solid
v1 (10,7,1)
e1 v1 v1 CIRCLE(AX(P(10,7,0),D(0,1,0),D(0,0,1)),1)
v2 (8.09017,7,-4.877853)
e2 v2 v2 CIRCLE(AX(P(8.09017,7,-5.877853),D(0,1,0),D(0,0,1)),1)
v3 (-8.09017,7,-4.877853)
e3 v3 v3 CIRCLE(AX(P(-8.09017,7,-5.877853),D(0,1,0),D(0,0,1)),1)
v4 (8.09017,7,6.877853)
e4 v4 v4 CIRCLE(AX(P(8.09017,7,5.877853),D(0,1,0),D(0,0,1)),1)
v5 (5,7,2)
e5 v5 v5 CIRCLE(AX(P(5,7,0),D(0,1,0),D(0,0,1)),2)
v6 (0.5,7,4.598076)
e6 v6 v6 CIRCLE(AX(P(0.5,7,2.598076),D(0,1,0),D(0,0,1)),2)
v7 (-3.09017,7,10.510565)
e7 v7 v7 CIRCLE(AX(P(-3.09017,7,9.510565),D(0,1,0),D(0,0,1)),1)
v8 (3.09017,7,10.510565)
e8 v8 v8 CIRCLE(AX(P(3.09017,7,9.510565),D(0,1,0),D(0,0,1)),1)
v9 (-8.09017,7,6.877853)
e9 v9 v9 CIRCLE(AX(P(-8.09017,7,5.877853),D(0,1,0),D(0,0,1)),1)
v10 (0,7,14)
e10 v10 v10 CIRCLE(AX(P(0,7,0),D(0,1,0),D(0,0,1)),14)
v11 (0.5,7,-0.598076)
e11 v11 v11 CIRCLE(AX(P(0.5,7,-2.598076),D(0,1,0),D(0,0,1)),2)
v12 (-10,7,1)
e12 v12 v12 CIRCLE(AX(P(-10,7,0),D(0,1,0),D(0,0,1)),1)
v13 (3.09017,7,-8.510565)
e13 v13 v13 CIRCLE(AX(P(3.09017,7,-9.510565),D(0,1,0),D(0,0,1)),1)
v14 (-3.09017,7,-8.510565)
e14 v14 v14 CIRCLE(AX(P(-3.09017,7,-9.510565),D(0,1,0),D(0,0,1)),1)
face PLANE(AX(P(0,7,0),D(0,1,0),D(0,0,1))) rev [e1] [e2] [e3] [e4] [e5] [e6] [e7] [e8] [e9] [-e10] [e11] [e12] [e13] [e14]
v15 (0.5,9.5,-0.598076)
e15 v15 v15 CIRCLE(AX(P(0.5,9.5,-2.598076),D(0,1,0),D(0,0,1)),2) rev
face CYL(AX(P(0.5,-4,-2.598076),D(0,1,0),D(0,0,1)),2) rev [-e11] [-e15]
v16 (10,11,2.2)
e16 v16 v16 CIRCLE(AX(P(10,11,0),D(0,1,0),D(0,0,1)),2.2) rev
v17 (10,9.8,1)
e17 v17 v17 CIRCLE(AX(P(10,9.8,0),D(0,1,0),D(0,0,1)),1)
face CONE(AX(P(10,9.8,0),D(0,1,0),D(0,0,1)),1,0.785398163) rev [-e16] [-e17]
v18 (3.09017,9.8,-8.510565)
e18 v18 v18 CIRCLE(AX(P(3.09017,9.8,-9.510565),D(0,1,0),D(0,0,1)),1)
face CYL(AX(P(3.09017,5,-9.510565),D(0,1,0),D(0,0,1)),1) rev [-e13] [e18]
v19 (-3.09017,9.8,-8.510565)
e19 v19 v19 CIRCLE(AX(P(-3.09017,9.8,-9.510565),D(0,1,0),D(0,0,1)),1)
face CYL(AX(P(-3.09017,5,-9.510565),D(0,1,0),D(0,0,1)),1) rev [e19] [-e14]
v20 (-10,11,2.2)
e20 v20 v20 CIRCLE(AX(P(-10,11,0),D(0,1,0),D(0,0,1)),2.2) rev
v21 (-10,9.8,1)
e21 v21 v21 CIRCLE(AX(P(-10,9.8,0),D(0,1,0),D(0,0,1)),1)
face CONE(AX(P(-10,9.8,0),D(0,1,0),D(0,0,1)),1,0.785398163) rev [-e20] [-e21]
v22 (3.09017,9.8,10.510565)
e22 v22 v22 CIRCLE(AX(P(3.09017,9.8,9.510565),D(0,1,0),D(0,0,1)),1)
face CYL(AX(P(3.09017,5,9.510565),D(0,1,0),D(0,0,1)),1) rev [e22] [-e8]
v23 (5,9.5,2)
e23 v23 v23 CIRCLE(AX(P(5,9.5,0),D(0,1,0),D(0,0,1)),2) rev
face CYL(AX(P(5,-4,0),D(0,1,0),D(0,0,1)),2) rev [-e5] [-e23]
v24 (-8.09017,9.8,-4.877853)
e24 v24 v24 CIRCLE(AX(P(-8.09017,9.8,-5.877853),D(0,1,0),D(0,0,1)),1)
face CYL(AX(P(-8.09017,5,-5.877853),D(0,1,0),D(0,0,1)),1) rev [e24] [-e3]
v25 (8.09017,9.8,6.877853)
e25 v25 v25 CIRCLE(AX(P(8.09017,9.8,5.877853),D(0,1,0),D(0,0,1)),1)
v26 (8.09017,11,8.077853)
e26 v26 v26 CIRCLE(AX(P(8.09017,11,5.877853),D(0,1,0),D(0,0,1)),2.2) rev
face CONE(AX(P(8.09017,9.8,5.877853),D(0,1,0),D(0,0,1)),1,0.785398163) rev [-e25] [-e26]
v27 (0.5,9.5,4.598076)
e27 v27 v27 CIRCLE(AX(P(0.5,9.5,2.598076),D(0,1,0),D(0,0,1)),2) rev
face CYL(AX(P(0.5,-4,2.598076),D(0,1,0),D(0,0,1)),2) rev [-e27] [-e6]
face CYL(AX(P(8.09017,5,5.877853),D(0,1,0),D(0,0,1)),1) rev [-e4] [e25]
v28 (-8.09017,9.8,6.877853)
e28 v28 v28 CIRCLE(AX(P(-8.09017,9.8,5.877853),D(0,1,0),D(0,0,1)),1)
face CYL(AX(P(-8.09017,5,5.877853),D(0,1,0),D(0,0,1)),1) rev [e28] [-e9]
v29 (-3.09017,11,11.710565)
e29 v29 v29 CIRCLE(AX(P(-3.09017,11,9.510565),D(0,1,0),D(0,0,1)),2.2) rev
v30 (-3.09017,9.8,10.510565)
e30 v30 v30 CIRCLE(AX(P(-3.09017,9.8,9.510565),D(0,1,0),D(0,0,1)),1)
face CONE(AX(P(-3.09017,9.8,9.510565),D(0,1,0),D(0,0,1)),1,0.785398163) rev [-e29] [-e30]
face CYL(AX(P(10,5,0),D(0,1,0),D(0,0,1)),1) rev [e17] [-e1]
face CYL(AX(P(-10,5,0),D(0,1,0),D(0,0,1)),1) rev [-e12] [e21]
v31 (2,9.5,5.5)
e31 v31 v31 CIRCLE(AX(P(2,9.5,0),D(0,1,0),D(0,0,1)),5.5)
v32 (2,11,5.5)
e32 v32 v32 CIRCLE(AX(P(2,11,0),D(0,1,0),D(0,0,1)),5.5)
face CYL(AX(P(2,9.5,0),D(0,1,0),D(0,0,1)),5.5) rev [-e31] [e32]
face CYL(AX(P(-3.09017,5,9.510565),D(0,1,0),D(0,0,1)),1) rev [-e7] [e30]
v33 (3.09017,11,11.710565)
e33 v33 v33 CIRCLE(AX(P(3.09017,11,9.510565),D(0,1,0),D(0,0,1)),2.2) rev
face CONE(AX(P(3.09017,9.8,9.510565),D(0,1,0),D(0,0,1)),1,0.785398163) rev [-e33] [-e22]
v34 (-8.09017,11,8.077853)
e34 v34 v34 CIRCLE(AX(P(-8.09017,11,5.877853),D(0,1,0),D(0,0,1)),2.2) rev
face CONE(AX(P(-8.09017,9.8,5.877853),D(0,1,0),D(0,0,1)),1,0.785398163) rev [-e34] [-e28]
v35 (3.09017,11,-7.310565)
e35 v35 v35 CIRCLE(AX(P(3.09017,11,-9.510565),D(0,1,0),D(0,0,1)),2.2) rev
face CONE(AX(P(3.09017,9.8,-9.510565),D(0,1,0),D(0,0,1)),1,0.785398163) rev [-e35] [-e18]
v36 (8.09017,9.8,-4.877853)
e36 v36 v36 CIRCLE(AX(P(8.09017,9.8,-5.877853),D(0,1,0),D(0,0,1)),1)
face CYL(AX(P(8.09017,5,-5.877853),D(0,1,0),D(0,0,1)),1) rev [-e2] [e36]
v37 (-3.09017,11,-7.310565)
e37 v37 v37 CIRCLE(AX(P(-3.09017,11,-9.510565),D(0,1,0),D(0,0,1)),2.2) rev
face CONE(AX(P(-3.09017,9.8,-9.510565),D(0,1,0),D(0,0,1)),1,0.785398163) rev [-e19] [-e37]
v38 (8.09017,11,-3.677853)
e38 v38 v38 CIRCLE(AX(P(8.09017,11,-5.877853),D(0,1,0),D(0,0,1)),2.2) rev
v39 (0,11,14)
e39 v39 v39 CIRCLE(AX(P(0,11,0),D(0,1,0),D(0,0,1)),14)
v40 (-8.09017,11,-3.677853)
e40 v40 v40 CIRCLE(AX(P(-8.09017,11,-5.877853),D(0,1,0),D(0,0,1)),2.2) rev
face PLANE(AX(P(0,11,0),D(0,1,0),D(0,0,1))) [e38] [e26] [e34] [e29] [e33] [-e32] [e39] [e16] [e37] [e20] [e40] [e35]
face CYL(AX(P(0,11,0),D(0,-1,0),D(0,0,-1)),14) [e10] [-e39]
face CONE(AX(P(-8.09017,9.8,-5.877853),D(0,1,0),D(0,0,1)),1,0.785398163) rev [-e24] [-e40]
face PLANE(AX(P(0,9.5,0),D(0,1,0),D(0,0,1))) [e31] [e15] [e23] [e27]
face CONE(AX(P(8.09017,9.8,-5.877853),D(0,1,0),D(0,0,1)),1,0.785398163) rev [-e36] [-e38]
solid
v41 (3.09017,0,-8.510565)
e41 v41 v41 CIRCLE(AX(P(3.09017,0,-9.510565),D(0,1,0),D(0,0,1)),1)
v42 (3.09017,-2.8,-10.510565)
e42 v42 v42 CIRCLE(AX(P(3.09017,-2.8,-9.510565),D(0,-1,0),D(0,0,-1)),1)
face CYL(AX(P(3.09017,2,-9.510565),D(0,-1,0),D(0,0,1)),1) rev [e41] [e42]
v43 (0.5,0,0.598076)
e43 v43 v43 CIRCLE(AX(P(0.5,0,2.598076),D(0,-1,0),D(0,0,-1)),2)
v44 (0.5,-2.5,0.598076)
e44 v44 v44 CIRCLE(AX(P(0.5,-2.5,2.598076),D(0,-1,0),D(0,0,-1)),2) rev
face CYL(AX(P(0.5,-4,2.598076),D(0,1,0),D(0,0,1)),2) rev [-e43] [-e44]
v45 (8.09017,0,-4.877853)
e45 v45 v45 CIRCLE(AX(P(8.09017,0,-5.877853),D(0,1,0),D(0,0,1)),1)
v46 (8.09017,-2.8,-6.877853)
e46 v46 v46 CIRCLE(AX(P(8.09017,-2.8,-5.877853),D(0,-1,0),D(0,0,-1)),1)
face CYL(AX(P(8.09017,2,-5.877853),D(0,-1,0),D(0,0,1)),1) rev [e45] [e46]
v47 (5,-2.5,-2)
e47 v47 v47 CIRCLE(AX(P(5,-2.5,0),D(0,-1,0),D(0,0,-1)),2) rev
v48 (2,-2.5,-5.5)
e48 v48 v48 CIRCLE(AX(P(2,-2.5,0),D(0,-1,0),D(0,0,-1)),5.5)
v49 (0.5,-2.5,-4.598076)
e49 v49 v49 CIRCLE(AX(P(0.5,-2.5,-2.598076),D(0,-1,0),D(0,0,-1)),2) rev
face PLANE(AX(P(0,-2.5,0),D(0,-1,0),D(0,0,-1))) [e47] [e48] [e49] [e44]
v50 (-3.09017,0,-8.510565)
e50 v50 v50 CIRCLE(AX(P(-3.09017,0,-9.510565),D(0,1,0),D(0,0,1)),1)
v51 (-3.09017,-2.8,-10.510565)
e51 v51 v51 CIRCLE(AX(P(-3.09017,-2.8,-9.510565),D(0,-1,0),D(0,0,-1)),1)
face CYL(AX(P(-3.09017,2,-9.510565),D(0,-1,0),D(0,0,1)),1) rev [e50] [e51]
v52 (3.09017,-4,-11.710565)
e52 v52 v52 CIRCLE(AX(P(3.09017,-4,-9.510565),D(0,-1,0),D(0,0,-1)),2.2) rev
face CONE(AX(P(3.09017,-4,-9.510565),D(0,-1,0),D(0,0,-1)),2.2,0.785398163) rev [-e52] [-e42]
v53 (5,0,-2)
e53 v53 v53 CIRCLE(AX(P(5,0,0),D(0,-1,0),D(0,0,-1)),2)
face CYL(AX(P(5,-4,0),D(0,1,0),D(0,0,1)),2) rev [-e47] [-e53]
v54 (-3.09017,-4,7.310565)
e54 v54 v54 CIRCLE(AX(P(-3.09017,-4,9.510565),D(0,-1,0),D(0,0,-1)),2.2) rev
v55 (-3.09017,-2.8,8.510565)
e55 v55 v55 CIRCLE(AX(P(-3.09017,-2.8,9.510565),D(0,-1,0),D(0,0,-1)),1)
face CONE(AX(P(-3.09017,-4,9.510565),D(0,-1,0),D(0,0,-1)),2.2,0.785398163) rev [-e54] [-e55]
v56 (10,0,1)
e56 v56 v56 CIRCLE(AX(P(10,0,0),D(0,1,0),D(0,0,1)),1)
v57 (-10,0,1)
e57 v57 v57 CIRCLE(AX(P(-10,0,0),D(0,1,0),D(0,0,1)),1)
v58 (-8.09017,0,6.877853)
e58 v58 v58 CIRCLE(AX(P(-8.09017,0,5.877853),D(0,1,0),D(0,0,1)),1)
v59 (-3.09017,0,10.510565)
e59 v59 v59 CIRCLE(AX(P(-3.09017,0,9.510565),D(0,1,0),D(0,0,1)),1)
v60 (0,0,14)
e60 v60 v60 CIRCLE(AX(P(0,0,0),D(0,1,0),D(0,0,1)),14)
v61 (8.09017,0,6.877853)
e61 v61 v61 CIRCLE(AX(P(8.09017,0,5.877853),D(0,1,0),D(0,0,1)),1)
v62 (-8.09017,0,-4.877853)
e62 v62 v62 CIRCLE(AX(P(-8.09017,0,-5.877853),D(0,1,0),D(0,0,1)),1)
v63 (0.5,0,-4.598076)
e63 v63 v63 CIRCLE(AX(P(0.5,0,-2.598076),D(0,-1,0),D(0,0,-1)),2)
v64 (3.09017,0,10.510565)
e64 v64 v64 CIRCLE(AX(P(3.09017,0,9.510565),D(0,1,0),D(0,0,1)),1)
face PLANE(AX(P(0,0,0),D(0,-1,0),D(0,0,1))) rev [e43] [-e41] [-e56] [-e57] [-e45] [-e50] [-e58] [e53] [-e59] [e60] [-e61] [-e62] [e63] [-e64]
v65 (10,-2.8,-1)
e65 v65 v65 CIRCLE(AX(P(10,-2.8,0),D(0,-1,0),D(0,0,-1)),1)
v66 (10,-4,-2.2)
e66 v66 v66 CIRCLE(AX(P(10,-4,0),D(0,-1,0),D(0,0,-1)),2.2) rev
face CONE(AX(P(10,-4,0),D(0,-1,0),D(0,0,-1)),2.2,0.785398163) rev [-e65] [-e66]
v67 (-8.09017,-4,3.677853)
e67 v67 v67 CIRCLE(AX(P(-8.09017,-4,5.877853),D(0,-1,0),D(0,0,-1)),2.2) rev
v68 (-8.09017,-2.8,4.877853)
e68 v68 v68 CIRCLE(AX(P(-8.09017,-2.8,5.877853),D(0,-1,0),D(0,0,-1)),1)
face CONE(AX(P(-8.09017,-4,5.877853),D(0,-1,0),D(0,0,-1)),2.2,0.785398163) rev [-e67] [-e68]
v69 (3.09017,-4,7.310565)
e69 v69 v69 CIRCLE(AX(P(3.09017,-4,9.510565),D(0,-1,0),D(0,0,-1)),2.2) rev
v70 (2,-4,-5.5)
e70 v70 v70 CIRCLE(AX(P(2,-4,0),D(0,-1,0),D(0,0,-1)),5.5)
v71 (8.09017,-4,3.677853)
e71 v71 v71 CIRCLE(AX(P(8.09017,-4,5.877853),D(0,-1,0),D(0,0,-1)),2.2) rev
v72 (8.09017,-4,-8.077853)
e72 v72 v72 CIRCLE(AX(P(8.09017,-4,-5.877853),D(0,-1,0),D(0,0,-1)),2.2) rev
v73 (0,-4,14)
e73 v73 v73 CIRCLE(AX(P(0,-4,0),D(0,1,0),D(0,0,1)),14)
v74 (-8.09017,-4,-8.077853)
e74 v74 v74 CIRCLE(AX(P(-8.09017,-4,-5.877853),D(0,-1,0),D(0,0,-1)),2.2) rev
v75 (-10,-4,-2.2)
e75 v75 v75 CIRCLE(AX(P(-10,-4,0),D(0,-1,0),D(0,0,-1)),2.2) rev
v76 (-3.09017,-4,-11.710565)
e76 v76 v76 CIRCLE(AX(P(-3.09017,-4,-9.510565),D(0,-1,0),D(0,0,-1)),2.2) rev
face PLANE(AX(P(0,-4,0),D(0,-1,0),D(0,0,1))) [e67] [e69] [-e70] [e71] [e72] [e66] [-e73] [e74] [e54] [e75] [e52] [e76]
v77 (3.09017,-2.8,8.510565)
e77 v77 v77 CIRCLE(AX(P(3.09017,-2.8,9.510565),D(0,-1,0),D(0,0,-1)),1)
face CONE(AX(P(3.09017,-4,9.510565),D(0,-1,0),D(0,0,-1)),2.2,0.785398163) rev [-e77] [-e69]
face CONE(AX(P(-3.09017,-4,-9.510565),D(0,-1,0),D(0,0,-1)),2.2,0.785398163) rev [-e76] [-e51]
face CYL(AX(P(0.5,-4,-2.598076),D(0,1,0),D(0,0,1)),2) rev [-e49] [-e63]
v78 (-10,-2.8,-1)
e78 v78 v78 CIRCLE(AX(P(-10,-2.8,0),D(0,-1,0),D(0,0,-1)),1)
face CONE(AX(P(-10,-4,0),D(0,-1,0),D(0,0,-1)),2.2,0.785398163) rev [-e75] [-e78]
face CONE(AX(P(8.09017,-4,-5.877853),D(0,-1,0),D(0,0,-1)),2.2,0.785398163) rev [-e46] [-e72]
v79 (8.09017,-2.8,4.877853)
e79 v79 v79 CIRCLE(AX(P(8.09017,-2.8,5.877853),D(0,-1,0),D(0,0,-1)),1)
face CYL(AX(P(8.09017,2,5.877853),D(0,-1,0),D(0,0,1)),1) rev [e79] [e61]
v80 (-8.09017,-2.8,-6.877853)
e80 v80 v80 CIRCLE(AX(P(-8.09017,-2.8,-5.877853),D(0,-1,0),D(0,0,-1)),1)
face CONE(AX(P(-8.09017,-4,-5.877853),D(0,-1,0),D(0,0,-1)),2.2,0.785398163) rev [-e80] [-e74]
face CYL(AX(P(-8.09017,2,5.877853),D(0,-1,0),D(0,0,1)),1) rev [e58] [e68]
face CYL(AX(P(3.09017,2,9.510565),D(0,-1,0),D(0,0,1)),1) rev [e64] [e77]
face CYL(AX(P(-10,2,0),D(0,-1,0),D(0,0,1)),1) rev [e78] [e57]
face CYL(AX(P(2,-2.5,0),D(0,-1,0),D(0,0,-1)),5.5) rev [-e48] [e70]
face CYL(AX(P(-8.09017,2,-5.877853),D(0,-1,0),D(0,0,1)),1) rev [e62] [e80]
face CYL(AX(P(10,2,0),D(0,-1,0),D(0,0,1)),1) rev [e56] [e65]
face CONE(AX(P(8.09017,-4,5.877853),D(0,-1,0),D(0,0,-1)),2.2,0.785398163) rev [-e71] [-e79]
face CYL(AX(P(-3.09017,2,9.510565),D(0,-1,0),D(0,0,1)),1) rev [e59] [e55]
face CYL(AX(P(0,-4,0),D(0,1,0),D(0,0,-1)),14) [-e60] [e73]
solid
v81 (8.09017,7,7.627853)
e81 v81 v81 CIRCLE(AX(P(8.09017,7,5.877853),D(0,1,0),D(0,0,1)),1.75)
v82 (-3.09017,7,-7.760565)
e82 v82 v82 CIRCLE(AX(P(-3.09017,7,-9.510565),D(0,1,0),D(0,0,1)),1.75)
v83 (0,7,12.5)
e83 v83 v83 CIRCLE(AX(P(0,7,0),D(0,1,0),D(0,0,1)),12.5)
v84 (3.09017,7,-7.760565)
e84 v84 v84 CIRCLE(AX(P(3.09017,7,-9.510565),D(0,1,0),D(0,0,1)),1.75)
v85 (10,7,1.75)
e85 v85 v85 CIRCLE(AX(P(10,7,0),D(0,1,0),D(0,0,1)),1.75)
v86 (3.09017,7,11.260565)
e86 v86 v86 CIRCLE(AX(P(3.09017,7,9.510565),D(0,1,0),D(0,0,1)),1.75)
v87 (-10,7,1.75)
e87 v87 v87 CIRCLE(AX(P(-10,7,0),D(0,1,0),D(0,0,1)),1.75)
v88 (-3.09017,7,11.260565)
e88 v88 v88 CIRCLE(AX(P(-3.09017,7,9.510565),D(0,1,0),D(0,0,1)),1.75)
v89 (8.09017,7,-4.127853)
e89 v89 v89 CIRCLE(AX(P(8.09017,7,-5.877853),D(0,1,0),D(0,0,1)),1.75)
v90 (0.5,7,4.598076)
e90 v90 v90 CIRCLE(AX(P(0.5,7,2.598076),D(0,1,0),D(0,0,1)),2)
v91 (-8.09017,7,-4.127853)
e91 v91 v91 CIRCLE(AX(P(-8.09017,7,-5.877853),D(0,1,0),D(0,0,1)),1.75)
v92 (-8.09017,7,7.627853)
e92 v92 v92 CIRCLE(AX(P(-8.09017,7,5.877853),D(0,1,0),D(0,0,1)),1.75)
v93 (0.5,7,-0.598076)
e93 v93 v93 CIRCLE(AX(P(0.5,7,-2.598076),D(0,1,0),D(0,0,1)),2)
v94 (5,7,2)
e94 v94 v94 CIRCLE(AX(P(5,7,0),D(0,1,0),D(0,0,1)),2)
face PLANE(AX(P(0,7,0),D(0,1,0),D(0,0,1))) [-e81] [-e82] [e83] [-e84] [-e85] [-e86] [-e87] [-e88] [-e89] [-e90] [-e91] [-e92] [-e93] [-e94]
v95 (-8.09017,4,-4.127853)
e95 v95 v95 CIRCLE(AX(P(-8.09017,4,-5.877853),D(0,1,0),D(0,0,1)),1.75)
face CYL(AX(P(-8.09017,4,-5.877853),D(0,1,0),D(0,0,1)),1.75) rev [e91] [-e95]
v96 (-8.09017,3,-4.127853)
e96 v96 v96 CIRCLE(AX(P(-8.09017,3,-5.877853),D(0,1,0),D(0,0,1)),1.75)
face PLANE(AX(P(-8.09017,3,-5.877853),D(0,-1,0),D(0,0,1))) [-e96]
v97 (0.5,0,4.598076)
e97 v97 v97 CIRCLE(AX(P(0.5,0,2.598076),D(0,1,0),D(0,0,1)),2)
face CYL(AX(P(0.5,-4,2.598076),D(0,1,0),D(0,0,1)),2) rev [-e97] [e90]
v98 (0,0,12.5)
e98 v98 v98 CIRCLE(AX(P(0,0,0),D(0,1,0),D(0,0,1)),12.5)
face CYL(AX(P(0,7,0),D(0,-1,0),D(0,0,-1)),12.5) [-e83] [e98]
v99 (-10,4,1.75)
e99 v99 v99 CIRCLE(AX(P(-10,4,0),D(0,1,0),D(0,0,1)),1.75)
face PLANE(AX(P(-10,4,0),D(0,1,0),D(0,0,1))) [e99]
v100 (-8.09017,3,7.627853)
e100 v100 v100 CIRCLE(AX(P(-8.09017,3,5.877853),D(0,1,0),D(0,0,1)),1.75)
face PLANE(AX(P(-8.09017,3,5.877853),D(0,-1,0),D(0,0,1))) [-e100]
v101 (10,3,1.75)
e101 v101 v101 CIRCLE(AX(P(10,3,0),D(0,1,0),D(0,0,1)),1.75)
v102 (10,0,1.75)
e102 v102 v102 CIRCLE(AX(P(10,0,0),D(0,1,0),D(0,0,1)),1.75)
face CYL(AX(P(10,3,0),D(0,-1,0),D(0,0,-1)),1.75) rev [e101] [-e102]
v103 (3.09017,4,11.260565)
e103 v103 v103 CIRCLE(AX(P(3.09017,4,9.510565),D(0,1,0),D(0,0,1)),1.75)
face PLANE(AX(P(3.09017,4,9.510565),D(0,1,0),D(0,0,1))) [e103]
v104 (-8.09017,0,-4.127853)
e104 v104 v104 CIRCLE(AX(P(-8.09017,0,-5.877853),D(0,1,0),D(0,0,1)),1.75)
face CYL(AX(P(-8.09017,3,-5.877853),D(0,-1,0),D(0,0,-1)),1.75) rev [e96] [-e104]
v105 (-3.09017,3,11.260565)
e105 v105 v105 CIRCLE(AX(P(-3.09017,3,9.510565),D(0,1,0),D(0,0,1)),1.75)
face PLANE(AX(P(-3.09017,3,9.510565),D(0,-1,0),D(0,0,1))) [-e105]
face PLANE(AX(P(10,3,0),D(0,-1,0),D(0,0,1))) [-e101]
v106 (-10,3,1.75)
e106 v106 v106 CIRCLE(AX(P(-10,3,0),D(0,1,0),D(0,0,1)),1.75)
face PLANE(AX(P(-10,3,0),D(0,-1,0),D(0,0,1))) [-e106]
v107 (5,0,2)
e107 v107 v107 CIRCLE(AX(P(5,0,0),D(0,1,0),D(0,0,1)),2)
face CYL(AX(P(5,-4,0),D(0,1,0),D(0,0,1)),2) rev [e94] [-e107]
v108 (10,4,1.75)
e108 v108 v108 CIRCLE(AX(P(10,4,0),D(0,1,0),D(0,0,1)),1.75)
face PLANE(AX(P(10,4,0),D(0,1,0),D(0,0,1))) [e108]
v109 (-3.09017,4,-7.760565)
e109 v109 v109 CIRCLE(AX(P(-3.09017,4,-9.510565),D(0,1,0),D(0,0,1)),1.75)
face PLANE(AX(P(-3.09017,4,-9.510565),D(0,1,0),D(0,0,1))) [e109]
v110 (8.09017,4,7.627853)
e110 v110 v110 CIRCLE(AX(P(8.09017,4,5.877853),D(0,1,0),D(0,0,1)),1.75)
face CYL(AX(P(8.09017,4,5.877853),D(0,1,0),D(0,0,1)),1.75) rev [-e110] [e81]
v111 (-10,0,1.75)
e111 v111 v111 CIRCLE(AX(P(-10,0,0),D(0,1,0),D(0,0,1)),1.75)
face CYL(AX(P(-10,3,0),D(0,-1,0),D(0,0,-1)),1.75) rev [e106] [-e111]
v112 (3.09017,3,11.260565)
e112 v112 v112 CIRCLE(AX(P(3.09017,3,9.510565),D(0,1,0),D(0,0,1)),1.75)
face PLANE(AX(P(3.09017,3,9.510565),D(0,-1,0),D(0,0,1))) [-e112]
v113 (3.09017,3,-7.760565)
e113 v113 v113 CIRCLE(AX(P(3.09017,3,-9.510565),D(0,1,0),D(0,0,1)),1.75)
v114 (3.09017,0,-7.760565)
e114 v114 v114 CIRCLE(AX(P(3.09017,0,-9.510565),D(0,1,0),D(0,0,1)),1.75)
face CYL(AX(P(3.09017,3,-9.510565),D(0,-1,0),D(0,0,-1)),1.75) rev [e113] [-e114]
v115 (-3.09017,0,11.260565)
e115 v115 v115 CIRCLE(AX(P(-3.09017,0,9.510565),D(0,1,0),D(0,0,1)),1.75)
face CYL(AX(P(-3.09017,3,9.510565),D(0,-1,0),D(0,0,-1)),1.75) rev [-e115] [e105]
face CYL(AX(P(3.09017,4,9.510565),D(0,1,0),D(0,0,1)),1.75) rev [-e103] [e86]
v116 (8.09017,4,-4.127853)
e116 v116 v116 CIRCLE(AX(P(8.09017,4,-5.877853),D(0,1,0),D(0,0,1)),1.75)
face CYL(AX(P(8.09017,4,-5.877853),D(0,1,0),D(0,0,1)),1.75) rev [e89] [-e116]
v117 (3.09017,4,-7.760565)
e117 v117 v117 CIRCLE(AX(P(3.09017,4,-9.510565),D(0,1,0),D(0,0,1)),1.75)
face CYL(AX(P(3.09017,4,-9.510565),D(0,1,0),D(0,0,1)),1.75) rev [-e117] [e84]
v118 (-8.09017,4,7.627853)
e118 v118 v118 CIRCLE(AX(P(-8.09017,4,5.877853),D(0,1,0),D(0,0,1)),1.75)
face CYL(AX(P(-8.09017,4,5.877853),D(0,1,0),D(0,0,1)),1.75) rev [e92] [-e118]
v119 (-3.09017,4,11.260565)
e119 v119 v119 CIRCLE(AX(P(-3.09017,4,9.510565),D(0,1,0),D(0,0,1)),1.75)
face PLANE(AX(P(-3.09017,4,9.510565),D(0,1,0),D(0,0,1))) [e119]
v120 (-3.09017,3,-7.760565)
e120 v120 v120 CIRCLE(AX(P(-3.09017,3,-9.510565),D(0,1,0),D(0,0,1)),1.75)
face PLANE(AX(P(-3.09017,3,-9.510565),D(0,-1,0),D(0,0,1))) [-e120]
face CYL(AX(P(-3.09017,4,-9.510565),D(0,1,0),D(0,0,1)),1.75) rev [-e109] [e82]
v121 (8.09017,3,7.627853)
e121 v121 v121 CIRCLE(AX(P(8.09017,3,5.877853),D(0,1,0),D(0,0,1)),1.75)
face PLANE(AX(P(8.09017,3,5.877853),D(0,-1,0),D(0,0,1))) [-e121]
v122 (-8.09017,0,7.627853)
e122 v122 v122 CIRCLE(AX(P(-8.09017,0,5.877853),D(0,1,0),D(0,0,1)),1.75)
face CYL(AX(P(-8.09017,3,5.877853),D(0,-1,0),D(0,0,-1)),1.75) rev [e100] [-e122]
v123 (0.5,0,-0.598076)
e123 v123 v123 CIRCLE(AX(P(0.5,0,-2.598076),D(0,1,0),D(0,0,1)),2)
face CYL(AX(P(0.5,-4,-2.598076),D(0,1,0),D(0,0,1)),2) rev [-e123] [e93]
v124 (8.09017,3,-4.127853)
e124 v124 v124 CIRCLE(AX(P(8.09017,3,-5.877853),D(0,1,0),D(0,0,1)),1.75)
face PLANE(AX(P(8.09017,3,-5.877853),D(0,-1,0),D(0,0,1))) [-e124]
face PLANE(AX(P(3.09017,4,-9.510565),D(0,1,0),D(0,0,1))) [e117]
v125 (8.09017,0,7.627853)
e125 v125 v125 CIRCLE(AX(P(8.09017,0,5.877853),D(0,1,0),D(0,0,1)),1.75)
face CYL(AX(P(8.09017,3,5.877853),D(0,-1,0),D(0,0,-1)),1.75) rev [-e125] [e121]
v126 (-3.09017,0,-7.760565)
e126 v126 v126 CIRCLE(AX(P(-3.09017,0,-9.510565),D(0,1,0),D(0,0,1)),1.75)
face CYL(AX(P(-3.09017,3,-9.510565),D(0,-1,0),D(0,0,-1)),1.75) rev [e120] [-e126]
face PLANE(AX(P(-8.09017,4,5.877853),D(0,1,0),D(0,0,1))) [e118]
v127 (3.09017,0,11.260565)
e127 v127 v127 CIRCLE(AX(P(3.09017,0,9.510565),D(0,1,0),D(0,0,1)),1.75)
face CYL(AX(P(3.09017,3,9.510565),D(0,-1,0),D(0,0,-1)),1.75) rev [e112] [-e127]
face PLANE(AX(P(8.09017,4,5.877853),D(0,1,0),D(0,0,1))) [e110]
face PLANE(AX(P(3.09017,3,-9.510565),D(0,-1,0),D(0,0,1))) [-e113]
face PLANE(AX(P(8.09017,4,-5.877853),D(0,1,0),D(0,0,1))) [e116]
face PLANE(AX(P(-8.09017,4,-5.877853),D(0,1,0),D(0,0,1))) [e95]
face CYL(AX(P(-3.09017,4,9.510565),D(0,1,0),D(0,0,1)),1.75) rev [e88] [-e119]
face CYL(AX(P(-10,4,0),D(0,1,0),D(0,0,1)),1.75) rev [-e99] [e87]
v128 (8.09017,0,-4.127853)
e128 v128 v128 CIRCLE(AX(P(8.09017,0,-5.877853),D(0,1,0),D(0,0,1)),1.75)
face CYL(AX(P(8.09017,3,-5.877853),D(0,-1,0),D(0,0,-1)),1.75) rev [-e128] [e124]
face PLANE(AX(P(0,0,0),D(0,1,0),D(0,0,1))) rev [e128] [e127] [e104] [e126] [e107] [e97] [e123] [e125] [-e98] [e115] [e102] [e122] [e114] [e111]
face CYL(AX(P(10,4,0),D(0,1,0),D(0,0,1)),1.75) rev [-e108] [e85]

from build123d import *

# Parameters (mm, degrees)
SKETCH1_R               = 12.5
BOSS_EXTRUDE1_DEPTH     = 7
SKETCH2_R               = 14
BOSS_EXTRUDE2_DEPTH     = 4
SKETCH3_R               = 14
BOSS_EXTRUDE3_DEPTH     = 4
SKETCH4_R               = 1
CUT_EXTRUDE1_DEPTH      = 6
SKETCH6_R               = 1.75
CUT_EXTRUDE2_DEPTH      = 3
CHAMFER1_SIZE           = 1.2
CHAMFER2_SIZE           = 1.2
CUT_EXTRUDE4_DEPTH      = 25.839484697
CUT_EXTRUDE4_DEPTH_BACK = 25.839484697
SKETCH7_R               = 2
SKETCH8_R               = 5.5
CUT_EXTRUDE5_DEPTH      = 1.5
SKETCH9_R               = 5.5
SKETCH9_R_2             = 2
BOSS_EXTRUDE4_DEPTH     = 3
SKETCH10_R              = 5.5
CUT_EXTRUDE6_DEPTH      = 1.5


# Read off the part's stored shape, not the designer's step: Intersect1
with BuildPart() as part:
    # Sketch1 → Boss-Extrude1 (new body)
    with BuildSketch(Plane(origin=(0, 0, 0), x_dir=(1, 0, 0), z_dir=(0, 1, 0))):
        with Locations(Location((0, 0, 0), (0, 0, 270))):
            Circle(SKETCH1_R)
    extrude(amount=BOSS_EXTRUDE1_DEPTH)

    # Sketch3 → Boss-Extrude3 (add)
    with BuildSketch(Plane.XZ):
        with Locations(Location((0, 0, 0), (0, 0, 90))):
            Circle(SKETCH3_R)
    extrude(amount=BOSS_EXTRUDE3_DEPTH)


with BuildPart() as body_2:
    # Sketch2 → Boss-Extrude2 (new body)
    with BuildSketch(Plane(origin=(0, 7, 0), x_dir=(1, 0, 0), z_dir=(0, 1, 0))):
        with Locations(Location((0, 0, 0), (0, 0, 270))):
            Circle(SKETCH2_R)
    extrude(amount=BOSS_EXTRUDE2_DEPTH)


with BuildPart() as cut_extrude1_tool:
    # Sketch4 → Cut-Extrude1 (new body)
    with BuildSketch(Plane(origin=(0, 11, 0), x_dir=(1, 0, 0), z_dir=(0, 1, 0))):
        with Locations(Location((10, 0, 0), (0, 0, 270))):
            Circle(SKETCH4_R)
        with Locations(Location((8.090169944, -5.877852523, 0), (0, 0, 270))):
            Circle(SKETCH4_R)
        with Locations(Location((3.090169944, -9.510565163, 0), (0, 0, 270))):
            Circle(SKETCH4_R)
        with Locations(Location((-3.090169944, -9.510565163, 0), (0, 0, 270))):
            Circle(SKETCH4_R)
        with Locations(Location((-8.090169944, -5.877852523, 0), (0, 0, 270))):
            Circle(SKETCH4_R)
        with Locations(Location((-10, 0, 0), (0, 0, 270))):
            Circle(SKETCH4_R)
        with Locations(Location((-8.090169944, 5.877852523, 0), (0, 0, 270))):
            Circle(SKETCH4_R)
        with Locations(Location((-3.090169944, 9.510565163, 0), (0, 0, 270))):
            Circle(SKETCH4_R)
        with Locations(Location((3.090169944, 9.510565163, 0), (0, 0, 270))):
            Circle(SKETCH4_R)
        with Locations(Location((8.090169944, 5.877852523, 0), (0, 0, 270))):
            Circle(SKETCH4_R)
    extrude(amount=-CUT_EXTRUDE1_DEPTH)


with BuildPart() as part_1:
    add(part.part)

    # Cut-Extrude1: cut by cut_extrude1_tool
    add(cut_extrude1_tool.part, mode=Mode.SUBTRACT)


with BuildPart() as body_2_1:
    add(body_2.part)

    # Cut-Extrude1: cut by cut_extrude1_tool
    add(cut_extrude1_tool.part, mode=Mode.SUBTRACT)


with BuildPart() as body_3:
    # Intersect1: the piece on the far side of the plane
    add(part_1.part)
    split(bisect_by=Plane(origin=(0, 0, 0), x_dir=(1, 0, 0), z_dir=(0, 1, 0)), keep=Keep.BOTTOM)


with BuildPart() as part_2:
    add(part_1.part)

    # Intersect1
    split(bisect_by=Plane(origin=(0, 0, 0), x_dir=(1, 0, 0), z_dir=(0, 1, 0)), keep=Keep.TOP)

    # Sketch6 → Cut-Extrude2 (cut)
    with BuildSketch(Plane(origin=(0, 7, 0), x_dir=(1, 0, 0), z_dir=(0, 1, 0))):
        with Locations(Location((-10, 0, 0), (0, 0, 270))):
            Circle(SKETCH6_R)
        with Locations(Location((-8.090169944, 5.877852523, 0), (0, 0, 270))):
            Circle(SKETCH6_R)
        with Locations(Location((-3.090169944, 9.510565163, 0), (0, 0, 270))):
            Circle(SKETCH6_R)
        with Locations(Location((3.090169944, 9.510565163, 0), (0, 0, 270))):
            Circle(SKETCH6_R)
        with Locations(Location((8.090169944, 5.877852523, 0), (0, 0, 270))):
            Circle(SKETCH6_R)
        with Locations(Location((10, 0, 0), (0, 0, 270))):
            Circle(SKETCH6_R)
        with Locations(Location((8.090169944, -5.877852523, 0), (0, 0, 270))):
            Circle(SKETCH6_R)
        with Locations(Location((3.090169944, -9.510565163, 0), (0, 0, 270))):
            Circle(SKETCH6_R)
        with Locations(Location((-3.090169944, -9.510565163, 0), (0, 0, 270))):
            Circle(SKETCH6_R)
        with Locations(Location((-8.090169944, -5.877852523, 0), (0, 0, 270))):
            Circle(SKETCH6_R)
    cut_extrude2 = extrude(amount=-CUT_EXTRUDE2_DEPTH, mode=Mode.SUBTRACT)

    # Mirror2: Cut-Extrude2 across plane
    add(cut_extrude2.mirror(Plane.ZX.offset(3.5)), mode=Mode.SUBTRACT)


with BuildPart() as body_3_2:
    # Mirror1: mirrored copy
    add(body_2_1.part.mirror(Plane.ZX.offset(3.5)))


with BuildPart() as body_3_3:
    # Mirror3: mirrored copy
    add(body_2_1.part.mirror(Plane.ZX.offset(3.5)))

    # Chamfer2
    chamfer2_edges = [body_3_3.edges().sort_by_distance(p)[0] for p in [
        (-8.090169944, -4, 4.877852523),
        (-10, -4, -1),
        (-8.090169944, -4, -6.877852523),
        (-3.090169944, -4, -10.510565163),
        (3.090169944, -4, -10.510565163),
        (8.090169944, -4, -6.877852523),
        (10, -4, -1),
        (8.090169944, -4, 4.877852523),
        (3.090169944, -4, 8.510565163),
        (-3.090169944, -4, 8.510565163),
    ]]
    chamfer(chamfer2_edges, length=CHAMFER2_SIZE)


with BuildPart() as body_2_2:
    add(body_2_1.part)

    # Chamfer1
    chamfer1_edges = [body_2_2.edges().sort_by_distance(p)[0] for p in [
        (-8.090169944, 11, 4.877852523),
        (-10, 11, -1),
        (-8.090169944, 11, -6.877852523),
        (-3.090169944, 11, -10.510565163),
        (3.090169944, 11, -10.510565163),
        (8.090169944, 11, -6.877852523),
        (10, 11, -1),
        (8.090169944, 11, 4.877852523),
        (3.090169944, 11, 8.510565163),
        (-3.090169944, 11, 8.510565163),
    ]]
    chamfer(chamfer1_edges, length=CHAMFER1_SIZE)


with BuildPart() as cut_extrude4_tool:
    # Sketch7 → Cut-Extrude4 (new, two sides: drawn at the far end of the back side and taken through both)
    with BuildSketch(Plane(origin=(0, 11, 0), x_dir=(1, 0, 0), z_dir=(0, 1, 0)).offset(-CUT_EXTRUDE4_DEPTH_BACK)):
        with Locations(Location((5, 0, 0), (0, 0, 270))):
            Circle(SKETCH7_R)
        with Locations(Location((0.5, -2.598076211, 0), (0, 0, 270))):
            Circle(SKETCH7_R)
        with Locations(Location((0.5, 2.598076211, 0), (0, 0, 270))):
            Circle(SKETCH7_R)
    extrude(amount=CUT_EXTRUDE4_DEPTH + CUT_EXTRUDE4_DEPTH_BACK)


with BuildPart() as part_3:
    add(part_2.part)

    # Cut-Extrude4: cut by cut_extrude4_tool
    add(cut_extrude4_tool.part, mode=Mode.SUBTRACT)


with BuildPart() as body_2_3:
    add(body_2_2.part)

    # Cut-Extrude4: cut by cut_extrude4_tool
    add(cut_extrude4_tool.part, mode=Mode.SUBTRACT)

    # Sketch8 → Cut-Extrude5 (cut)
    with BuildSketch(Plane(origin=(0, 11, 0), x_dir=(1, 0, 0), z_dir=(0, 1, 0))):
        with Locations(Location((2, 0, 0), (0, 0, 270))):
            Circle(SKETCH8_R)
    extrude(amount=-CUT_EXTRUDE5_DEPTH, mode=Mode.SUBTRACT)


with BuildPart() as body_3_3_1:
    add(body_3_3.part)

    # Cut-Extrude4: cut by cut_extrude4_tool
    add(cut_extrude4_tool.part, mode=Mode.SUBTRACT)

    # Sketch10 → Cut-Extrude6 (cut)
    with BuildSketch(Plane.XZ.offset(4)):
        with Locations(Location((2, 0, 0), (0, 0, 270))):
            Circle(SKETCH10_R)
    extrude(amount=-CUT_EXTRUDE6_DEPTH, mode=Mode.SUBTRACT)


with BuildPart() as body_4:
    # Sketch9 → Boss-Extrude4 (new body)
    with BuildSketch(Plane(origin=(0, 9.5, 0), x_dir=(1, 0, 0), z_dir=(0, 1, 0))):
        with Locations(Location((2, 0, 0), (0, 0, 270))):
            Circle(SKETCH9_R)
        with Locations(Location((5, 0, 0), (0, 0, 270))):
            Circle(SKETCH9_R_2, mode=Mode.SUBTRACT)
        with Locations(Location((0.5, -2.598076211, 0), (0, 0, 270))):
            Circle(SKETCH9_R_2, mode=Mode.SUBTRACT)
        with Locations(Location((0.5, 2.598076211, 0), (0, 0, 270))):
            Circle(SKETCH9_R_2, mode=Mode.SUBTRACT)
    extrude(amount=BOSS_EXTRUDE4_DEPTH)


solid = Compound([part_3.part, body_2_3.part, body_3_3_1.part])
